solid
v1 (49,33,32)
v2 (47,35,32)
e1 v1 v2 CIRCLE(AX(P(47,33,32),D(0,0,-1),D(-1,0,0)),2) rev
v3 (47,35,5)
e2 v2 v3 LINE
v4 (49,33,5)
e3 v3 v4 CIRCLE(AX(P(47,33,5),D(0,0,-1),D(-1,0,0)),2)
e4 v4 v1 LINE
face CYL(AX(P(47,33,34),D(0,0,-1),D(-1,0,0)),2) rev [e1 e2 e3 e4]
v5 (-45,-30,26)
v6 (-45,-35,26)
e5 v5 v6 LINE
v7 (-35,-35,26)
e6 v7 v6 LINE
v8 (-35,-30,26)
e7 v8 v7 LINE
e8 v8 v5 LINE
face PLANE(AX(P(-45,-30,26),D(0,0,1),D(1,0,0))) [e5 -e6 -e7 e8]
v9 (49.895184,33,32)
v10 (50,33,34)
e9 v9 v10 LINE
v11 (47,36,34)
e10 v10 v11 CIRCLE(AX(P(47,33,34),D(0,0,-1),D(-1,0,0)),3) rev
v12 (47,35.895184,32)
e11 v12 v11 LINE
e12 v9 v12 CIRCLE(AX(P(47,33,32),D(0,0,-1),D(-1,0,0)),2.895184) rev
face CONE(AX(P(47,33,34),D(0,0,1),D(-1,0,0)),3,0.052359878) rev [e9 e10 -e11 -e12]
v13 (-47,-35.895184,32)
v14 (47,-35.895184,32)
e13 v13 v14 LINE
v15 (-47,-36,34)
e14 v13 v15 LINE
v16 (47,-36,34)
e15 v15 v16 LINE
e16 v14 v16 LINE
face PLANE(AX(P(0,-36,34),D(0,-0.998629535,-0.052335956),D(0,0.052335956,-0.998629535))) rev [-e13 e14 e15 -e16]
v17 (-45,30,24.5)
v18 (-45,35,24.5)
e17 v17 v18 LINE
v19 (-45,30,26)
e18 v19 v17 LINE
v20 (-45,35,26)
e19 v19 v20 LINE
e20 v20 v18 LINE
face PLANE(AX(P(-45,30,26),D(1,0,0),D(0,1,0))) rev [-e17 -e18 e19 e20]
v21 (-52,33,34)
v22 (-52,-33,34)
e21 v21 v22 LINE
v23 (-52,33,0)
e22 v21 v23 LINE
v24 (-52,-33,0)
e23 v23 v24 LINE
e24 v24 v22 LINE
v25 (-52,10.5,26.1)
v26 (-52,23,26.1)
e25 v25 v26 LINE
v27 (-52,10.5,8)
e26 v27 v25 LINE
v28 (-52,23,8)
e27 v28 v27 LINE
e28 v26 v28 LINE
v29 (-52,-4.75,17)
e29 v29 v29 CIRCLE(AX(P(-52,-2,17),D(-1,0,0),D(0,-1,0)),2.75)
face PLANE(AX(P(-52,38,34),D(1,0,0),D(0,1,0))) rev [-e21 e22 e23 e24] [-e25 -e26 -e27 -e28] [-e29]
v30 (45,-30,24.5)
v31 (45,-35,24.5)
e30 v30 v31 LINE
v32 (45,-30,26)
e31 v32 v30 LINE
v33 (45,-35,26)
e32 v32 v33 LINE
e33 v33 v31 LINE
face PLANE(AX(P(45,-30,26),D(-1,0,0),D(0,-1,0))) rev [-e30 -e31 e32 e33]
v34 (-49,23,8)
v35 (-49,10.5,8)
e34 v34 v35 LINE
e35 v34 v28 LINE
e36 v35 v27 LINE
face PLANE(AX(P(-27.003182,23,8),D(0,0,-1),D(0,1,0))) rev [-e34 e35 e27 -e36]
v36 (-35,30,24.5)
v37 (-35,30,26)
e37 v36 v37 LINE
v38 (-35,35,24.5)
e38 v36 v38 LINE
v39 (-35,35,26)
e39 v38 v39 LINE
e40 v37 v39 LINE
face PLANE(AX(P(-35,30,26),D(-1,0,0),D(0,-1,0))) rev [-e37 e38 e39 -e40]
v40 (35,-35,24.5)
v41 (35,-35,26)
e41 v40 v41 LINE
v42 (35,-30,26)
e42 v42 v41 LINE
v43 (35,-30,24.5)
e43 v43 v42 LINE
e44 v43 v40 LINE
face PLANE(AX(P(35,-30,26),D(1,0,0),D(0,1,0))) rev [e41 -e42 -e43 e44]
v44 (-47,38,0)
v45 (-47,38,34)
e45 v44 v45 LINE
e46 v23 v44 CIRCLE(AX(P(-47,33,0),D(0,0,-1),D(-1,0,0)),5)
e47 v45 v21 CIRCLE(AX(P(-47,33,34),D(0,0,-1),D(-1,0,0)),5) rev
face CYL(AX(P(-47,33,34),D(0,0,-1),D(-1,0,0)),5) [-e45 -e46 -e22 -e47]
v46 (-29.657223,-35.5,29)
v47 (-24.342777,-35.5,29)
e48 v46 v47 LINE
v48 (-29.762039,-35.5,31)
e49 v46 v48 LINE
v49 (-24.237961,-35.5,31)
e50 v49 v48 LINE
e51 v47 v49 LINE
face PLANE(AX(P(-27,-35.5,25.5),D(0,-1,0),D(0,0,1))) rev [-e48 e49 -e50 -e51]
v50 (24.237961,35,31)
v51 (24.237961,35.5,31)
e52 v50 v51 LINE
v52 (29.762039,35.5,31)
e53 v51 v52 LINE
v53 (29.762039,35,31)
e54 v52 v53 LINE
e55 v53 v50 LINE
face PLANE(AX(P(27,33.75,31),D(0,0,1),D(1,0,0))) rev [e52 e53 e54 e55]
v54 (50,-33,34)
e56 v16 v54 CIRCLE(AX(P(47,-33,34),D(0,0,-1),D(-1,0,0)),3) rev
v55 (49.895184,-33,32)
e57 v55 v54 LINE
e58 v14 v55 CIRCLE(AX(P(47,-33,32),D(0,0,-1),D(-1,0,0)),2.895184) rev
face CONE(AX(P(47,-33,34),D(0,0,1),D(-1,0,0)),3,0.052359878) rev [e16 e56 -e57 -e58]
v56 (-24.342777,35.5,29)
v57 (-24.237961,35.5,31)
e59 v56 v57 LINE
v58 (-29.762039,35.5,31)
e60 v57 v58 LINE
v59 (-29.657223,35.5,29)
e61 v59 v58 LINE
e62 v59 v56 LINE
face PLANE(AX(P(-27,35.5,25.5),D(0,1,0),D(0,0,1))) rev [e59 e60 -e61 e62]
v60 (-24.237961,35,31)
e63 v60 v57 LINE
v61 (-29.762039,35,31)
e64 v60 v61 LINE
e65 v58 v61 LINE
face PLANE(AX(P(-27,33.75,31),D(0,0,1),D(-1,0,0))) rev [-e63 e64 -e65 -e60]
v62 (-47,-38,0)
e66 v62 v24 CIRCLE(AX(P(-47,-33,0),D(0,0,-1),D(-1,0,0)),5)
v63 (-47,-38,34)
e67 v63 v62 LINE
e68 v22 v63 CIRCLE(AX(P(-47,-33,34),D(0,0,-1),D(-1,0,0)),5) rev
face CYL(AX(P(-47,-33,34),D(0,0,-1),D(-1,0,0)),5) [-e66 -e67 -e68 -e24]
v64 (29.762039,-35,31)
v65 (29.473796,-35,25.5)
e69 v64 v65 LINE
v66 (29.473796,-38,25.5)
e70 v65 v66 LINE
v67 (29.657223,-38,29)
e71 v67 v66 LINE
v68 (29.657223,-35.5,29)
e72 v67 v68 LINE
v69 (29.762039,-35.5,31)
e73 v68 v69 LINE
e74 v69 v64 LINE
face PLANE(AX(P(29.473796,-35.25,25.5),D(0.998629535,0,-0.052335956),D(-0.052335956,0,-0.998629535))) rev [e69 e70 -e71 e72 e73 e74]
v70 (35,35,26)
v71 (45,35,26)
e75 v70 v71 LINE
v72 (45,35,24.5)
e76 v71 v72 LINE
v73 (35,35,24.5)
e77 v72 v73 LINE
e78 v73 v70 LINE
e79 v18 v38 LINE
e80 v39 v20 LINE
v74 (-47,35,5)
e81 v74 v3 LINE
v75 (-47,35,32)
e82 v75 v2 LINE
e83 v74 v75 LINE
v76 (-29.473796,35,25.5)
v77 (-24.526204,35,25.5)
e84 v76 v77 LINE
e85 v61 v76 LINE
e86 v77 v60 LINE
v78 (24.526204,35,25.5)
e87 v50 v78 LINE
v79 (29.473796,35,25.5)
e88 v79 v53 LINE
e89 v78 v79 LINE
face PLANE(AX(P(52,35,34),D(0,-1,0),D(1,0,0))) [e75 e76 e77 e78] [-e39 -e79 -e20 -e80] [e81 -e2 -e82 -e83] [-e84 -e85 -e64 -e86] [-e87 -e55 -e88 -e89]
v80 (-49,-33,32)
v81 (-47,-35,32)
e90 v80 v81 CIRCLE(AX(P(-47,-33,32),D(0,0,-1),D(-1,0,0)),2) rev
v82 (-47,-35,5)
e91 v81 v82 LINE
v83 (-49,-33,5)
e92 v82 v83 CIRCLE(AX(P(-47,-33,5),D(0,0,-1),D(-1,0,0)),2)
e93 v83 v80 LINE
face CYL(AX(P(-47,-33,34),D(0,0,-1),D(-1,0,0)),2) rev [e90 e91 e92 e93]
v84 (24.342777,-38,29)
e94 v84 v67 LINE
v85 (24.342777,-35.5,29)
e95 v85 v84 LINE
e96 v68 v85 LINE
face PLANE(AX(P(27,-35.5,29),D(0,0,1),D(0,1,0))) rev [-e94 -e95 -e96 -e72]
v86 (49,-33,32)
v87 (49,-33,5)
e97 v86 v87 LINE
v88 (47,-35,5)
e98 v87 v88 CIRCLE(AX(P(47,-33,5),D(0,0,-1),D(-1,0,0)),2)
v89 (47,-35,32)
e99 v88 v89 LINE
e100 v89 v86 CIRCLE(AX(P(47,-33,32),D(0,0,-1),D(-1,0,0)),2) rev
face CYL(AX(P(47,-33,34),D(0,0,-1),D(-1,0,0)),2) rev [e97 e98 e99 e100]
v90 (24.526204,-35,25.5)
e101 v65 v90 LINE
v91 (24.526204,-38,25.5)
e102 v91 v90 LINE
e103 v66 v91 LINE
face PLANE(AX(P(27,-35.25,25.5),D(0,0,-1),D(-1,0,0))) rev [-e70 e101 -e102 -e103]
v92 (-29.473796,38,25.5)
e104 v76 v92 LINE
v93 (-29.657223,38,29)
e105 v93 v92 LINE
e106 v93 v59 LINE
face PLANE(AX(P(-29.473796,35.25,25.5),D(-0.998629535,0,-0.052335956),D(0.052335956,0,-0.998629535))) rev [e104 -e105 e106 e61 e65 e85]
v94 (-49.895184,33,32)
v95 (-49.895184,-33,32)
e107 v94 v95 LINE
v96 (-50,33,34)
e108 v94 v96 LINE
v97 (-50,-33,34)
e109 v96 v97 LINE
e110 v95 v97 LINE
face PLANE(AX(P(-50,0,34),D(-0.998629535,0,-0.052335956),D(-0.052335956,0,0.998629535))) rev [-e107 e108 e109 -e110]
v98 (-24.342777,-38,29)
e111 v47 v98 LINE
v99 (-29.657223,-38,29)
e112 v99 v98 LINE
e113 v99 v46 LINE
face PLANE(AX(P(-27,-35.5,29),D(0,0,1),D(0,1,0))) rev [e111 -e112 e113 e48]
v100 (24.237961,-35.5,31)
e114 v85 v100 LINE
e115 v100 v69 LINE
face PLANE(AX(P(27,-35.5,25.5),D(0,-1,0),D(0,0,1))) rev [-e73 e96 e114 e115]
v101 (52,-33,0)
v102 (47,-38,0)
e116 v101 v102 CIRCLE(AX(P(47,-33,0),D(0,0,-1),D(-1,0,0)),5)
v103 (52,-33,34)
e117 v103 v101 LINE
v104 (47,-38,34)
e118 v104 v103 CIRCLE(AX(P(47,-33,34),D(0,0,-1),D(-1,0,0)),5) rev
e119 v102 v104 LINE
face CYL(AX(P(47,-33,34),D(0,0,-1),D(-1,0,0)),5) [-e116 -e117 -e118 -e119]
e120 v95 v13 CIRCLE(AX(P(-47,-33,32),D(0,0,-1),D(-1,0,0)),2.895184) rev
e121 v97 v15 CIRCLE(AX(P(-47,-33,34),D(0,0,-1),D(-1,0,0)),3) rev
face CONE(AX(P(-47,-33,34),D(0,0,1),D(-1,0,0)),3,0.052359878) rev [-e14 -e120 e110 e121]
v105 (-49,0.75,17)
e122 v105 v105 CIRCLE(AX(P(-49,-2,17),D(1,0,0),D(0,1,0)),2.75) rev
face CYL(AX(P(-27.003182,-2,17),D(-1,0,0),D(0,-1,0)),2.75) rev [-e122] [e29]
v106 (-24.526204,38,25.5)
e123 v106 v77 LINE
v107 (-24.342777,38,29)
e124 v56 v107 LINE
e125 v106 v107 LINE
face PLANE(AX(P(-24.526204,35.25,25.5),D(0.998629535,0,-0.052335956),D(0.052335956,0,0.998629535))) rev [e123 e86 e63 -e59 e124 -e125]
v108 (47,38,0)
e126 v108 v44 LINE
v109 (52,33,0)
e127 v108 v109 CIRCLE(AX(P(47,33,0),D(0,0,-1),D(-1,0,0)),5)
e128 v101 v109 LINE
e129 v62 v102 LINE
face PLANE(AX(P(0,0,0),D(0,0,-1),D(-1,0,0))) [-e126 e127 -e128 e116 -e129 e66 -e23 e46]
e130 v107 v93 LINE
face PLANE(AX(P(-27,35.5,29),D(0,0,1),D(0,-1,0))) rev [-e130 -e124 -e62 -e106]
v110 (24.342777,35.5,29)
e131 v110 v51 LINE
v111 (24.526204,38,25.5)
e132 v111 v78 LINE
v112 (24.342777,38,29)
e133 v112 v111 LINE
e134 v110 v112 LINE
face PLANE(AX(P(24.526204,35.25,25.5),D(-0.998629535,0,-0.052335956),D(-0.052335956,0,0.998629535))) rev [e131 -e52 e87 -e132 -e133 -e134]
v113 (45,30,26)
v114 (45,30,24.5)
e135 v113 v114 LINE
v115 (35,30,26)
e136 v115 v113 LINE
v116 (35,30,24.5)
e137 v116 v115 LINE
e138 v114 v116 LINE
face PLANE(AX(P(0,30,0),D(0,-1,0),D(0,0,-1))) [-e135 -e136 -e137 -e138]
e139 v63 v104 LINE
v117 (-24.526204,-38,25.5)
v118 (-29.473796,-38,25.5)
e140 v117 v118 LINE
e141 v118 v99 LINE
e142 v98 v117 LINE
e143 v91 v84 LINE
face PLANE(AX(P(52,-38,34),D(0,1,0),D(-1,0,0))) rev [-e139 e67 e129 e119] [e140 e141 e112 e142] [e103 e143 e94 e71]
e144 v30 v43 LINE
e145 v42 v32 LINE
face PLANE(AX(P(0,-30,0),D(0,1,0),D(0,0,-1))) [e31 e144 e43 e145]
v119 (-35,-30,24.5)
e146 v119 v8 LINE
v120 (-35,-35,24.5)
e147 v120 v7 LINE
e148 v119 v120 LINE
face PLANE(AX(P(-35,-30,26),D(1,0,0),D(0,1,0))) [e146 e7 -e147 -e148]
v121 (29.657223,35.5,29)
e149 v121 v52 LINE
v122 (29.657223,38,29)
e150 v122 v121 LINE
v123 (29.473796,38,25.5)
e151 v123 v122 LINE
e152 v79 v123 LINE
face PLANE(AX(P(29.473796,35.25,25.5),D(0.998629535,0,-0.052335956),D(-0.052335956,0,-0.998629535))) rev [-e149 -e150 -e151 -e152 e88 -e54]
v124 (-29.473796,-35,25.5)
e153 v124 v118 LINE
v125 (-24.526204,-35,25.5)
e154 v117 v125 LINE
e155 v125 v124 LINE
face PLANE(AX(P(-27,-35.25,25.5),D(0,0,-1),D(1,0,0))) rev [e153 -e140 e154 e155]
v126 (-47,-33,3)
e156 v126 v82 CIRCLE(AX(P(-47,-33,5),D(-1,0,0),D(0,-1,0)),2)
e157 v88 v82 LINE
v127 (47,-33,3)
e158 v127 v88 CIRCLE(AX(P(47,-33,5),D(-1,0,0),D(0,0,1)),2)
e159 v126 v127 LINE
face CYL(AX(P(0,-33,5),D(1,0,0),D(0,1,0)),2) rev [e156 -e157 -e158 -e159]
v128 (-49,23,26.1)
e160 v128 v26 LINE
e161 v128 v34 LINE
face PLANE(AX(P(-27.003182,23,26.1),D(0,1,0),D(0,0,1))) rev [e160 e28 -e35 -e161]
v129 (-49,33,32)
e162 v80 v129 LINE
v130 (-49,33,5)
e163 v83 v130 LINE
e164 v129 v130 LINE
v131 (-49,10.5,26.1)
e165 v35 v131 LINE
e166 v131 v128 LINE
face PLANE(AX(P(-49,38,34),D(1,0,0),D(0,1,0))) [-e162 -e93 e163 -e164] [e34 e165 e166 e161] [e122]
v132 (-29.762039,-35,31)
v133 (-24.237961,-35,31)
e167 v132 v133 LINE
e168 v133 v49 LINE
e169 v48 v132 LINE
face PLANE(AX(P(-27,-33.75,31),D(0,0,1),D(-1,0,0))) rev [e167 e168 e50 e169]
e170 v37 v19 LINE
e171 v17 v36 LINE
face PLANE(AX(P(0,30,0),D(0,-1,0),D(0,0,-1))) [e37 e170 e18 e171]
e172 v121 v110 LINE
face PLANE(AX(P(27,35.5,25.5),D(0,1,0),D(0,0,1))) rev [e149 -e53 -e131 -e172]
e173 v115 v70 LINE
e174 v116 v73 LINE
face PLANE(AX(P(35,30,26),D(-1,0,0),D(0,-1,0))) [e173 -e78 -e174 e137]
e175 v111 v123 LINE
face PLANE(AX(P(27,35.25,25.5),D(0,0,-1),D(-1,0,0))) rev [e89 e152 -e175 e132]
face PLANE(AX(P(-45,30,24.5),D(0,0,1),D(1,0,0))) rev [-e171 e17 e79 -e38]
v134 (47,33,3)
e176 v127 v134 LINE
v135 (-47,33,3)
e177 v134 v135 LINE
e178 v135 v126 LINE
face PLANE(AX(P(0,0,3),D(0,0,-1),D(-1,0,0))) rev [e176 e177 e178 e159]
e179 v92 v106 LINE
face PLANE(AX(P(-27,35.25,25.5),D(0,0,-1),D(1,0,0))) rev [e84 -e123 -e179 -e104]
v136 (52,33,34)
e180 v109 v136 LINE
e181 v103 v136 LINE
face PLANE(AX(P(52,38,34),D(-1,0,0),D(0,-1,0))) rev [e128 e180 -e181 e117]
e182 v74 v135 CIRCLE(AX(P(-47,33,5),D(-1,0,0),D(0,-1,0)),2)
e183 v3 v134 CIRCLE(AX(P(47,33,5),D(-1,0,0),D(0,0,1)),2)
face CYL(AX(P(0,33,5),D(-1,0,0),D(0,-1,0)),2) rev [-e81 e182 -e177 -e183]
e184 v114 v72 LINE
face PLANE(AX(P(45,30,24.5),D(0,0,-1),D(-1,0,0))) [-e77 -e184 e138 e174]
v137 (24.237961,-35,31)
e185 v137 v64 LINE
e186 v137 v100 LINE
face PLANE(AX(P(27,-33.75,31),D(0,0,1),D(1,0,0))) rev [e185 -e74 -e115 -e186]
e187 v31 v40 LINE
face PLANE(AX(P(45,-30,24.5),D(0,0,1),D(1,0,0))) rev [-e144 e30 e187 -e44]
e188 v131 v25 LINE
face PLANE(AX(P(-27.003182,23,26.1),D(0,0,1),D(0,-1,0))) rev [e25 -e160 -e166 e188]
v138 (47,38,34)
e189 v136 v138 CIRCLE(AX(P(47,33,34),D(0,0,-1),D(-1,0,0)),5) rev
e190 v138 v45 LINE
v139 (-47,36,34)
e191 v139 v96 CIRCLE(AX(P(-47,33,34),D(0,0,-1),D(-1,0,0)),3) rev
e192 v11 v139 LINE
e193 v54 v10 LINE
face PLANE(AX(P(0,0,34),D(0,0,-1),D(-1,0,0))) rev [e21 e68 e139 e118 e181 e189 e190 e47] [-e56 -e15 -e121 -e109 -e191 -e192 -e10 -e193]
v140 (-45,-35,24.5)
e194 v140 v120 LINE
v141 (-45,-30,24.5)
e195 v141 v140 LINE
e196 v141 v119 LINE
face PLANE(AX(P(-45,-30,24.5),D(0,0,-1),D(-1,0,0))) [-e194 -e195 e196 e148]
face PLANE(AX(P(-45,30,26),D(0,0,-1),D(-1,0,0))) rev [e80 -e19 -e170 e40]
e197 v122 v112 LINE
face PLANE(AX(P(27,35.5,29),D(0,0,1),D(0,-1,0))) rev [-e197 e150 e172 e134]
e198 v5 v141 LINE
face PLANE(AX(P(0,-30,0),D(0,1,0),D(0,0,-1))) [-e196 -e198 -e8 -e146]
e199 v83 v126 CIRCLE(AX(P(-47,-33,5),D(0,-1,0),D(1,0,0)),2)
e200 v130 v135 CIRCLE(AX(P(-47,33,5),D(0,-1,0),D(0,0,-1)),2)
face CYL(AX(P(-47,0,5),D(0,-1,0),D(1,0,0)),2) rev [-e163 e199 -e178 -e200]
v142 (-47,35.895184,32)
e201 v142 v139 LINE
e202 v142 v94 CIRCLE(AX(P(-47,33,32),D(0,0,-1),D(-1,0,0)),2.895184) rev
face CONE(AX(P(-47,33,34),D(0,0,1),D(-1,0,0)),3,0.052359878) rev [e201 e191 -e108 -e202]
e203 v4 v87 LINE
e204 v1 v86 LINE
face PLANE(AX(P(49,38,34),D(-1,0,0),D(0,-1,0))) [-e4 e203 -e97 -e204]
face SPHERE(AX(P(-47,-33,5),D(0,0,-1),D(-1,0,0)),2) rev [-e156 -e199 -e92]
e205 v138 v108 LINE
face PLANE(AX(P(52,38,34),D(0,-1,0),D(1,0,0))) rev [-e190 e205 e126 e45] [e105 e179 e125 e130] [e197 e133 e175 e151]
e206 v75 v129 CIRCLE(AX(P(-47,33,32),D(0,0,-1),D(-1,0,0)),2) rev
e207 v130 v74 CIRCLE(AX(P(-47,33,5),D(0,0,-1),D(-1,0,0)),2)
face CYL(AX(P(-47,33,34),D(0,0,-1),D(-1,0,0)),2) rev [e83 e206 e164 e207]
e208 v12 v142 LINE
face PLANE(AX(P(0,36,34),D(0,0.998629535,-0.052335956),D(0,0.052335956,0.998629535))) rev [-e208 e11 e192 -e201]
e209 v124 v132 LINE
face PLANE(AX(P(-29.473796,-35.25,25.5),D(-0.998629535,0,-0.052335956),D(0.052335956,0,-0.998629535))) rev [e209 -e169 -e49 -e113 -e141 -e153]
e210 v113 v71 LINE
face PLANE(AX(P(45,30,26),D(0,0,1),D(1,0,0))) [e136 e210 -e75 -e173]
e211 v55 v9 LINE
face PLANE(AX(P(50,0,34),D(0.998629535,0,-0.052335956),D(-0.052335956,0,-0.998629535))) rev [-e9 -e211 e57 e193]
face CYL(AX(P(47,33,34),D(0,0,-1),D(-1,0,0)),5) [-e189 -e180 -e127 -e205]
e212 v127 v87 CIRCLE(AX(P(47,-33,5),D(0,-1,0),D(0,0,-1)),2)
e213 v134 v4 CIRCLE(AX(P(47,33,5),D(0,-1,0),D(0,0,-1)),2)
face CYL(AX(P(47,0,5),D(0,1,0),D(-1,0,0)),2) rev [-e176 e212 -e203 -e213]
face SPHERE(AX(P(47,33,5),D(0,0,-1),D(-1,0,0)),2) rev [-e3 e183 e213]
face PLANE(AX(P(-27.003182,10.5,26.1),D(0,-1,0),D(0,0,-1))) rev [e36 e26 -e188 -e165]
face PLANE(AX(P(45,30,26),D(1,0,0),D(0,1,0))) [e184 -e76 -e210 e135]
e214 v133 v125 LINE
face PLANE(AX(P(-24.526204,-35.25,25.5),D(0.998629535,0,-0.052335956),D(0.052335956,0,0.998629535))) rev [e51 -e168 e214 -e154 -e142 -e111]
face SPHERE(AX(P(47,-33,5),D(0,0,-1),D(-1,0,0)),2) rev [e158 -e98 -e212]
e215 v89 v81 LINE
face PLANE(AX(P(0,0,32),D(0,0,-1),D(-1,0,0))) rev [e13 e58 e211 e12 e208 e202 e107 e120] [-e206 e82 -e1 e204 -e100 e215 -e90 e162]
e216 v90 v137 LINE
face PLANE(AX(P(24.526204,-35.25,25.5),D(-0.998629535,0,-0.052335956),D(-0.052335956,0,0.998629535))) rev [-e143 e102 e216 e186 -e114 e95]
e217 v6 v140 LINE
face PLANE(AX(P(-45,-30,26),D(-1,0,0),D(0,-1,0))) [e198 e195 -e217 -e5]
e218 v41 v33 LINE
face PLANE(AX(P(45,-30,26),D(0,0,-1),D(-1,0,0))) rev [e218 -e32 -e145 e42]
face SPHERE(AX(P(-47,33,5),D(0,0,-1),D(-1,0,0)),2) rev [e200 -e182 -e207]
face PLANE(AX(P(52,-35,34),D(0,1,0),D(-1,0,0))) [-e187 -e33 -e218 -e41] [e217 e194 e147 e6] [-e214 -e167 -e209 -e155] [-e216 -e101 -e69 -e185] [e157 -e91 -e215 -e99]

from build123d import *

# Parameters (mm, degrees)
SKETCH1_W                                = 104
SKETCH1_H                                = 76
BOSS_EXTRUDE1_DEPTH                      = 34
FILLET1_R                                = 5
SHELL1_T                                 = -3
FILLET2_R                                = 2
SKETCH2_W                                = 10
SKETCH2_H                                = 1.5
BOSS_EXTRUDE2_DEPTH                      = 5
MIRROR2_COPY_1_SKETCH_W                  = 10
MIRROR2_COPY_1_SKETCH_H                  = 1.5
MIRROR2_COPY_1_DEPTH                     = 5
LIP_GROOVE3_GROOVE_DEPTH                 = 2
LIP_GROOVE3_GROOVE_DRAFT                 = -3
SNAP_START                               = -38
SNAP_GROOVE1_DEPTH                       = 3
SNAP_START_2                             = -35.5
SNAP_GROOVE1_2_DEPTH                     = 0.5
MIRROR4_START                            = -38
MIRROR4_AT_THE_SECOND_PLANE_COPY_1_DEPTH = 3
MIRROR4_START_2                          = -35.5
MIRROR4_AT_THE_SECOND_PLANE_COPY_2_DEPTH = 0.5
MIRROR4_AT_THE_SECOND_PLANE_COPY_3_DEPTH = 0.5
SKETCH4_R                                = 2.75
SKETCH4_W                                = 18.1
SKETCH4_H                                = 12.5
CUT_EXTRUDE1_DEPTH                       = 3


# Read off the part's stored shape, not the designer's step: Lip&Groove3-Groove, Snap Groove1
with BuildPart() as part:
    # Sketch1 → Boss-Extrude1 (new body)
    with BuildSketch(Plane.XY):
        Rectangle(SKETCH1_W, SKETCH1_H)
    extrude(amount=BOSS_EXTRUDE1_DEPTH)

    # Fillet1
    fillet1_edges = [part.edges().sort_by_distance(p)[0] for p in [
        (-52, 38, 17),
        (52, 38, 17),
        (52, -38, 17),
        (-52, -38, 17),
    ]]
    fillet(fillet1_edges, radius=FILLET1_R)

    # Shell1
    shell1_openings = [part.faces().sort_by_distance(p)[0] for p in [
        (0, 0, 34),
    ]]
    offset(amount=SHELL1_T, openings=shell1_openings, kind=Kind.INTERSECTION)

    # Fillet2
    fillet2_edges = [part.edges().sort_by_distance(p)[0] for p in [
        (-49, 0, 3),
        (0, -35, 3),
        (49, 0, 3),
        (0, 35, 3),
        (-48.414213562, 34.414213562, 3),
        (48.414213562, 34.414213562, 3),
        (48.414213562, -34.414213562, 3),
        (-48.414213562, -34.414213562, 3),
    ]]
    fillet(fillet2_edges, radius=FILLET2_R)

    # Sketch2 → Boss-Extrude2 (add)
    with BuildSketch(Plane.XZ.offset(-35)):
        with Locations((-40, 25.25)):
            Rectangle(SKETCH2_W, SKETCH2_H)
    boss_extrude2 = extrude(amount=BOSS_EXTRUDE2_DEPTH)

    # Mirror1: Boss-Extrude2 across plane
    add(boss_extrude2.mirror(Plane(origin=(0, 0, 0), x_dir=(0, 0, 1), z_dir=(1, 0, 0))))

    # Mirror2: Boss-Extrude2 across plane
    add(boss_extrude2.mirror(Plane.ZX))

    # Mirror2 copy 1 sketch → Mirror2 copy 1 (add)
    with BuildSketch(Plane(origin=(0, -35, 0), x_dir=(-1, 0, 0), z_dir=(0, 1, 0))):
        with Locations((-40, 25.25)):
            Rectangle(MIRROR2_COPY_1_SKETCH_W, MIRROR2_COPY_1_SKETCH_H)
    extrude(amount=MIRROR2_COPY_1_DEPTH)


with BuildPart() as lip_groove3_groove_tool:
    # Lip&Groove3-Groove outline → Lip&Groove3-Groove (with draft: the straight prism first)
    with BuildSketch(Plane.XY.offset(32)):
        with BuildLine():
            ThreePointArc((-47, 35.895184441), (-49.047204551, 35.047204551), (-49.895184441, 33))
            Line((-49.895184441, 33), (-49.895184441, -33))
            ThreePointArc((-49.895184441, -33), (-49.047204551, -35.047204551), (-47, -35.895184441))
            Line((-47, -35.895184441), (47, -35.895184441))
            ThreePointArc((47, -35.895184441), (49.047204551, -35.047204551), (49.895184441, -33))
            Line((49.895184441, -33), (49.895184441, 33))
            ThreePointArc((49.895184441, 33), (49.047204551, 35.047204551), (47, 35.895184441))
            Line((47, 35.895184441), (-47, 35.895184441))
        make_face()
        with BuildLine():
            Line((-47, 35), (47, 35))
            ThreePointArc((47, 35), (48.414213562, 34.414213562), (49, 33))
            Line((49, 33), (49, -33))
            ThreePointArc((49, -33), (48.414213562, -34.414213562), (47, -35))
            Line((47, -35), (-47, -35))
            ThreePointArc((-47, -35), (-48.414213562, -34.414213562), (-49, -33))
            Line((-49, -33), (-49, 33))
            ThreePointArc((-49, 33), (-48.414213562, 34.414213562), (-47, 35))
        make_face(mode=Mode.SUBTRACT)
    extrude(amount=LIP_GROOVE3_GROOVE_DEPTH)
    # Lip&Groove3-Groove: the draft: its side faces are tilted about the plane it starts from
    lip_groove3_groove_sides = [lip_groove3_groove_tool.faces().sort_by_distance(p)[0] for p in [
        (-49.047204551, 35.047204551, 33),
        (-49.895184441, 0, 33),
        (-49.047204551, -35.047204551, 33),
        (0, -35.895184441, 33),
        (49.047204551, -35.047204551, 33),
        (49.895184441, 0, 33),
        (49.047204551, 35.047204551, 33),
        (0, 35.895184441, 33),
        (0, 35, 33),
        (48.414213562, 34.414213562, 33),
        (49, 0, 33),
        (48.414213562, -34.414213562, 33),
        (0, -35, 33),
        (-48.414213562, -34.414213562, 33),
        (-49, 0, 33),
        (-48.414213562, 34.414213562, 33),
    ]]
    draft(lip_groove3_groove_sides, Plane.XY.offset(32), LIP_GROOVE3_GROOVE_DRAFT)


with BuildPart() as part_1:
    add(part.part)

    # Lip&Groove3-Groove: cut by lip_groove3_groove_tool
    add(lip_groove3_groove_tool.part, mode=Mode.SUBTRACT)

    # Snap Groove1 outline → Snap Groove1 (cut)
    with BuildSketch(Plane(origin=(0, 0, 0), x_dir=(1, 0, 0), z_dir=(0, 1, 0)).offset(SNAP_START)):
        Polygon((-29.47379611, -25.5), (-29.657223337, -29), (-24.342776662, -29), (-24.52620389, -25.5), align=None)
    snap_groove1 = extrude(amount=SNAP_GROOVE1_DEPTH, mode=Mode.SUBTRACT)

    # Snap Groove1 2 outline → Snap Groove1 2 (cut)
    with BuildSketch(Plane(origin=(0, 0, 0), x_dir=(1, 0, 0), z_dir=(0, 1, 0)).offset(SNAP_START_2)):
        Polygon((-24.342776662, -29), (-29.657223338, -29), (-29.762038896, -31), (-24.237961104, -31), align=None)
    snap_groove1_2 = extrude(amount=SNAP_GROOVE1_2_DEPTH, mode=Mode.SUBTRACT)

    # Mirror4: Snap Groove1, Snap Groove1 2 across plane
    add(snap_groove1.mirror(Plane(origin=(0, 0, 0), x_dir=(0, 0, 1), z_dir=(1, 0, 0))), mode=Mode.SUBTRACT)
    add(snap_groove1_2.mirror(Plane(origin=(0, 0, 0), x_dir=(0, 0, 1), z_dir=(1, 0, 0))), mode=Mode.SUBTRACT)

    # Mirror4 at the second plane: Snap Groove1, Snap Groove1 2 across plane
    add(snap_groove1.mirror(Plane.ZX), mode=Mode.SUBTRACT)
    add(snap_groove1_2.mirror(Plane.ZX), mode=Mode.SUBTRACT)

    # Mirror4 at the second plane copy 1 sketc → Mirror4 at the second plane copy 1 (cut)
    with BuildSketch(Plane(origin=(0, 0, 0), x_dir=(-1, 0, 0), z_dir=(0, -1, 0)).offset(MIRROR4_START)):
        Polygon((-29.47379611, -25.5), (-29.657223337, -29), (-24.342776662, -29), (-24.52620389, -25.5), align=None)
    extrude(amount=MIRROR4_AT_THE_SECOND_PLANE_COPY_1_DEPTH, mode=Mode.SUBTRACT)

    # Mirror4 at the second plane copy 2 sketc → Mirror4 at the second plane copy 2 (cut)
    with BuildSketch(Plane(origin=(0, 0, 0), x_dir=(-1, 0, 0), z_dir=(0, -1, 0)).offset(MIRROR4_START_2)):
        Polygon((-24.342776662, -29), (-29.657223338, -29), (-29.762038896, -31), (-24.237961104, -31), align=None)
    extrude(amount=MIRROR4_AT_THE_SECOND_PLANE_COPY_2_DEPTH, mode=Mode.SUBTRACT)

    # Mirror4 at the second plane copy 3 sketc → Mirror4 at the second plane copy 3 (cut)
    with BuildSketch(Plane.XZ.offset(MIRROR4_START_2)):
        Polygon((-24.342776662, 29), (-29.657223338, 29), (-29.762038896, 31), (-24.237961104, 31), align=None)
    extrude(amount=MIRROR4_AT_THE_SECOND_PLANE_COPY_3_DEPTH, mode=Mode.SUBTRACT)

    # Sketch4 → Cut-Extrude1 (cut)
    with BuildSketch(Plane.ZY.offset(52)):
        with Locations(Location((17, -2, 0), (0, 0, 270))):
            Circle(SKETCH4_R)
        with Locations((17.05, 16.75)):
            Rectangle(SKETCH4_W, SKETCH4_H)
    extrude(amount=-CUT_EXTRUDE1_DEPTH, mode=Mode.SUBTRACT)


solid = part_1.part
